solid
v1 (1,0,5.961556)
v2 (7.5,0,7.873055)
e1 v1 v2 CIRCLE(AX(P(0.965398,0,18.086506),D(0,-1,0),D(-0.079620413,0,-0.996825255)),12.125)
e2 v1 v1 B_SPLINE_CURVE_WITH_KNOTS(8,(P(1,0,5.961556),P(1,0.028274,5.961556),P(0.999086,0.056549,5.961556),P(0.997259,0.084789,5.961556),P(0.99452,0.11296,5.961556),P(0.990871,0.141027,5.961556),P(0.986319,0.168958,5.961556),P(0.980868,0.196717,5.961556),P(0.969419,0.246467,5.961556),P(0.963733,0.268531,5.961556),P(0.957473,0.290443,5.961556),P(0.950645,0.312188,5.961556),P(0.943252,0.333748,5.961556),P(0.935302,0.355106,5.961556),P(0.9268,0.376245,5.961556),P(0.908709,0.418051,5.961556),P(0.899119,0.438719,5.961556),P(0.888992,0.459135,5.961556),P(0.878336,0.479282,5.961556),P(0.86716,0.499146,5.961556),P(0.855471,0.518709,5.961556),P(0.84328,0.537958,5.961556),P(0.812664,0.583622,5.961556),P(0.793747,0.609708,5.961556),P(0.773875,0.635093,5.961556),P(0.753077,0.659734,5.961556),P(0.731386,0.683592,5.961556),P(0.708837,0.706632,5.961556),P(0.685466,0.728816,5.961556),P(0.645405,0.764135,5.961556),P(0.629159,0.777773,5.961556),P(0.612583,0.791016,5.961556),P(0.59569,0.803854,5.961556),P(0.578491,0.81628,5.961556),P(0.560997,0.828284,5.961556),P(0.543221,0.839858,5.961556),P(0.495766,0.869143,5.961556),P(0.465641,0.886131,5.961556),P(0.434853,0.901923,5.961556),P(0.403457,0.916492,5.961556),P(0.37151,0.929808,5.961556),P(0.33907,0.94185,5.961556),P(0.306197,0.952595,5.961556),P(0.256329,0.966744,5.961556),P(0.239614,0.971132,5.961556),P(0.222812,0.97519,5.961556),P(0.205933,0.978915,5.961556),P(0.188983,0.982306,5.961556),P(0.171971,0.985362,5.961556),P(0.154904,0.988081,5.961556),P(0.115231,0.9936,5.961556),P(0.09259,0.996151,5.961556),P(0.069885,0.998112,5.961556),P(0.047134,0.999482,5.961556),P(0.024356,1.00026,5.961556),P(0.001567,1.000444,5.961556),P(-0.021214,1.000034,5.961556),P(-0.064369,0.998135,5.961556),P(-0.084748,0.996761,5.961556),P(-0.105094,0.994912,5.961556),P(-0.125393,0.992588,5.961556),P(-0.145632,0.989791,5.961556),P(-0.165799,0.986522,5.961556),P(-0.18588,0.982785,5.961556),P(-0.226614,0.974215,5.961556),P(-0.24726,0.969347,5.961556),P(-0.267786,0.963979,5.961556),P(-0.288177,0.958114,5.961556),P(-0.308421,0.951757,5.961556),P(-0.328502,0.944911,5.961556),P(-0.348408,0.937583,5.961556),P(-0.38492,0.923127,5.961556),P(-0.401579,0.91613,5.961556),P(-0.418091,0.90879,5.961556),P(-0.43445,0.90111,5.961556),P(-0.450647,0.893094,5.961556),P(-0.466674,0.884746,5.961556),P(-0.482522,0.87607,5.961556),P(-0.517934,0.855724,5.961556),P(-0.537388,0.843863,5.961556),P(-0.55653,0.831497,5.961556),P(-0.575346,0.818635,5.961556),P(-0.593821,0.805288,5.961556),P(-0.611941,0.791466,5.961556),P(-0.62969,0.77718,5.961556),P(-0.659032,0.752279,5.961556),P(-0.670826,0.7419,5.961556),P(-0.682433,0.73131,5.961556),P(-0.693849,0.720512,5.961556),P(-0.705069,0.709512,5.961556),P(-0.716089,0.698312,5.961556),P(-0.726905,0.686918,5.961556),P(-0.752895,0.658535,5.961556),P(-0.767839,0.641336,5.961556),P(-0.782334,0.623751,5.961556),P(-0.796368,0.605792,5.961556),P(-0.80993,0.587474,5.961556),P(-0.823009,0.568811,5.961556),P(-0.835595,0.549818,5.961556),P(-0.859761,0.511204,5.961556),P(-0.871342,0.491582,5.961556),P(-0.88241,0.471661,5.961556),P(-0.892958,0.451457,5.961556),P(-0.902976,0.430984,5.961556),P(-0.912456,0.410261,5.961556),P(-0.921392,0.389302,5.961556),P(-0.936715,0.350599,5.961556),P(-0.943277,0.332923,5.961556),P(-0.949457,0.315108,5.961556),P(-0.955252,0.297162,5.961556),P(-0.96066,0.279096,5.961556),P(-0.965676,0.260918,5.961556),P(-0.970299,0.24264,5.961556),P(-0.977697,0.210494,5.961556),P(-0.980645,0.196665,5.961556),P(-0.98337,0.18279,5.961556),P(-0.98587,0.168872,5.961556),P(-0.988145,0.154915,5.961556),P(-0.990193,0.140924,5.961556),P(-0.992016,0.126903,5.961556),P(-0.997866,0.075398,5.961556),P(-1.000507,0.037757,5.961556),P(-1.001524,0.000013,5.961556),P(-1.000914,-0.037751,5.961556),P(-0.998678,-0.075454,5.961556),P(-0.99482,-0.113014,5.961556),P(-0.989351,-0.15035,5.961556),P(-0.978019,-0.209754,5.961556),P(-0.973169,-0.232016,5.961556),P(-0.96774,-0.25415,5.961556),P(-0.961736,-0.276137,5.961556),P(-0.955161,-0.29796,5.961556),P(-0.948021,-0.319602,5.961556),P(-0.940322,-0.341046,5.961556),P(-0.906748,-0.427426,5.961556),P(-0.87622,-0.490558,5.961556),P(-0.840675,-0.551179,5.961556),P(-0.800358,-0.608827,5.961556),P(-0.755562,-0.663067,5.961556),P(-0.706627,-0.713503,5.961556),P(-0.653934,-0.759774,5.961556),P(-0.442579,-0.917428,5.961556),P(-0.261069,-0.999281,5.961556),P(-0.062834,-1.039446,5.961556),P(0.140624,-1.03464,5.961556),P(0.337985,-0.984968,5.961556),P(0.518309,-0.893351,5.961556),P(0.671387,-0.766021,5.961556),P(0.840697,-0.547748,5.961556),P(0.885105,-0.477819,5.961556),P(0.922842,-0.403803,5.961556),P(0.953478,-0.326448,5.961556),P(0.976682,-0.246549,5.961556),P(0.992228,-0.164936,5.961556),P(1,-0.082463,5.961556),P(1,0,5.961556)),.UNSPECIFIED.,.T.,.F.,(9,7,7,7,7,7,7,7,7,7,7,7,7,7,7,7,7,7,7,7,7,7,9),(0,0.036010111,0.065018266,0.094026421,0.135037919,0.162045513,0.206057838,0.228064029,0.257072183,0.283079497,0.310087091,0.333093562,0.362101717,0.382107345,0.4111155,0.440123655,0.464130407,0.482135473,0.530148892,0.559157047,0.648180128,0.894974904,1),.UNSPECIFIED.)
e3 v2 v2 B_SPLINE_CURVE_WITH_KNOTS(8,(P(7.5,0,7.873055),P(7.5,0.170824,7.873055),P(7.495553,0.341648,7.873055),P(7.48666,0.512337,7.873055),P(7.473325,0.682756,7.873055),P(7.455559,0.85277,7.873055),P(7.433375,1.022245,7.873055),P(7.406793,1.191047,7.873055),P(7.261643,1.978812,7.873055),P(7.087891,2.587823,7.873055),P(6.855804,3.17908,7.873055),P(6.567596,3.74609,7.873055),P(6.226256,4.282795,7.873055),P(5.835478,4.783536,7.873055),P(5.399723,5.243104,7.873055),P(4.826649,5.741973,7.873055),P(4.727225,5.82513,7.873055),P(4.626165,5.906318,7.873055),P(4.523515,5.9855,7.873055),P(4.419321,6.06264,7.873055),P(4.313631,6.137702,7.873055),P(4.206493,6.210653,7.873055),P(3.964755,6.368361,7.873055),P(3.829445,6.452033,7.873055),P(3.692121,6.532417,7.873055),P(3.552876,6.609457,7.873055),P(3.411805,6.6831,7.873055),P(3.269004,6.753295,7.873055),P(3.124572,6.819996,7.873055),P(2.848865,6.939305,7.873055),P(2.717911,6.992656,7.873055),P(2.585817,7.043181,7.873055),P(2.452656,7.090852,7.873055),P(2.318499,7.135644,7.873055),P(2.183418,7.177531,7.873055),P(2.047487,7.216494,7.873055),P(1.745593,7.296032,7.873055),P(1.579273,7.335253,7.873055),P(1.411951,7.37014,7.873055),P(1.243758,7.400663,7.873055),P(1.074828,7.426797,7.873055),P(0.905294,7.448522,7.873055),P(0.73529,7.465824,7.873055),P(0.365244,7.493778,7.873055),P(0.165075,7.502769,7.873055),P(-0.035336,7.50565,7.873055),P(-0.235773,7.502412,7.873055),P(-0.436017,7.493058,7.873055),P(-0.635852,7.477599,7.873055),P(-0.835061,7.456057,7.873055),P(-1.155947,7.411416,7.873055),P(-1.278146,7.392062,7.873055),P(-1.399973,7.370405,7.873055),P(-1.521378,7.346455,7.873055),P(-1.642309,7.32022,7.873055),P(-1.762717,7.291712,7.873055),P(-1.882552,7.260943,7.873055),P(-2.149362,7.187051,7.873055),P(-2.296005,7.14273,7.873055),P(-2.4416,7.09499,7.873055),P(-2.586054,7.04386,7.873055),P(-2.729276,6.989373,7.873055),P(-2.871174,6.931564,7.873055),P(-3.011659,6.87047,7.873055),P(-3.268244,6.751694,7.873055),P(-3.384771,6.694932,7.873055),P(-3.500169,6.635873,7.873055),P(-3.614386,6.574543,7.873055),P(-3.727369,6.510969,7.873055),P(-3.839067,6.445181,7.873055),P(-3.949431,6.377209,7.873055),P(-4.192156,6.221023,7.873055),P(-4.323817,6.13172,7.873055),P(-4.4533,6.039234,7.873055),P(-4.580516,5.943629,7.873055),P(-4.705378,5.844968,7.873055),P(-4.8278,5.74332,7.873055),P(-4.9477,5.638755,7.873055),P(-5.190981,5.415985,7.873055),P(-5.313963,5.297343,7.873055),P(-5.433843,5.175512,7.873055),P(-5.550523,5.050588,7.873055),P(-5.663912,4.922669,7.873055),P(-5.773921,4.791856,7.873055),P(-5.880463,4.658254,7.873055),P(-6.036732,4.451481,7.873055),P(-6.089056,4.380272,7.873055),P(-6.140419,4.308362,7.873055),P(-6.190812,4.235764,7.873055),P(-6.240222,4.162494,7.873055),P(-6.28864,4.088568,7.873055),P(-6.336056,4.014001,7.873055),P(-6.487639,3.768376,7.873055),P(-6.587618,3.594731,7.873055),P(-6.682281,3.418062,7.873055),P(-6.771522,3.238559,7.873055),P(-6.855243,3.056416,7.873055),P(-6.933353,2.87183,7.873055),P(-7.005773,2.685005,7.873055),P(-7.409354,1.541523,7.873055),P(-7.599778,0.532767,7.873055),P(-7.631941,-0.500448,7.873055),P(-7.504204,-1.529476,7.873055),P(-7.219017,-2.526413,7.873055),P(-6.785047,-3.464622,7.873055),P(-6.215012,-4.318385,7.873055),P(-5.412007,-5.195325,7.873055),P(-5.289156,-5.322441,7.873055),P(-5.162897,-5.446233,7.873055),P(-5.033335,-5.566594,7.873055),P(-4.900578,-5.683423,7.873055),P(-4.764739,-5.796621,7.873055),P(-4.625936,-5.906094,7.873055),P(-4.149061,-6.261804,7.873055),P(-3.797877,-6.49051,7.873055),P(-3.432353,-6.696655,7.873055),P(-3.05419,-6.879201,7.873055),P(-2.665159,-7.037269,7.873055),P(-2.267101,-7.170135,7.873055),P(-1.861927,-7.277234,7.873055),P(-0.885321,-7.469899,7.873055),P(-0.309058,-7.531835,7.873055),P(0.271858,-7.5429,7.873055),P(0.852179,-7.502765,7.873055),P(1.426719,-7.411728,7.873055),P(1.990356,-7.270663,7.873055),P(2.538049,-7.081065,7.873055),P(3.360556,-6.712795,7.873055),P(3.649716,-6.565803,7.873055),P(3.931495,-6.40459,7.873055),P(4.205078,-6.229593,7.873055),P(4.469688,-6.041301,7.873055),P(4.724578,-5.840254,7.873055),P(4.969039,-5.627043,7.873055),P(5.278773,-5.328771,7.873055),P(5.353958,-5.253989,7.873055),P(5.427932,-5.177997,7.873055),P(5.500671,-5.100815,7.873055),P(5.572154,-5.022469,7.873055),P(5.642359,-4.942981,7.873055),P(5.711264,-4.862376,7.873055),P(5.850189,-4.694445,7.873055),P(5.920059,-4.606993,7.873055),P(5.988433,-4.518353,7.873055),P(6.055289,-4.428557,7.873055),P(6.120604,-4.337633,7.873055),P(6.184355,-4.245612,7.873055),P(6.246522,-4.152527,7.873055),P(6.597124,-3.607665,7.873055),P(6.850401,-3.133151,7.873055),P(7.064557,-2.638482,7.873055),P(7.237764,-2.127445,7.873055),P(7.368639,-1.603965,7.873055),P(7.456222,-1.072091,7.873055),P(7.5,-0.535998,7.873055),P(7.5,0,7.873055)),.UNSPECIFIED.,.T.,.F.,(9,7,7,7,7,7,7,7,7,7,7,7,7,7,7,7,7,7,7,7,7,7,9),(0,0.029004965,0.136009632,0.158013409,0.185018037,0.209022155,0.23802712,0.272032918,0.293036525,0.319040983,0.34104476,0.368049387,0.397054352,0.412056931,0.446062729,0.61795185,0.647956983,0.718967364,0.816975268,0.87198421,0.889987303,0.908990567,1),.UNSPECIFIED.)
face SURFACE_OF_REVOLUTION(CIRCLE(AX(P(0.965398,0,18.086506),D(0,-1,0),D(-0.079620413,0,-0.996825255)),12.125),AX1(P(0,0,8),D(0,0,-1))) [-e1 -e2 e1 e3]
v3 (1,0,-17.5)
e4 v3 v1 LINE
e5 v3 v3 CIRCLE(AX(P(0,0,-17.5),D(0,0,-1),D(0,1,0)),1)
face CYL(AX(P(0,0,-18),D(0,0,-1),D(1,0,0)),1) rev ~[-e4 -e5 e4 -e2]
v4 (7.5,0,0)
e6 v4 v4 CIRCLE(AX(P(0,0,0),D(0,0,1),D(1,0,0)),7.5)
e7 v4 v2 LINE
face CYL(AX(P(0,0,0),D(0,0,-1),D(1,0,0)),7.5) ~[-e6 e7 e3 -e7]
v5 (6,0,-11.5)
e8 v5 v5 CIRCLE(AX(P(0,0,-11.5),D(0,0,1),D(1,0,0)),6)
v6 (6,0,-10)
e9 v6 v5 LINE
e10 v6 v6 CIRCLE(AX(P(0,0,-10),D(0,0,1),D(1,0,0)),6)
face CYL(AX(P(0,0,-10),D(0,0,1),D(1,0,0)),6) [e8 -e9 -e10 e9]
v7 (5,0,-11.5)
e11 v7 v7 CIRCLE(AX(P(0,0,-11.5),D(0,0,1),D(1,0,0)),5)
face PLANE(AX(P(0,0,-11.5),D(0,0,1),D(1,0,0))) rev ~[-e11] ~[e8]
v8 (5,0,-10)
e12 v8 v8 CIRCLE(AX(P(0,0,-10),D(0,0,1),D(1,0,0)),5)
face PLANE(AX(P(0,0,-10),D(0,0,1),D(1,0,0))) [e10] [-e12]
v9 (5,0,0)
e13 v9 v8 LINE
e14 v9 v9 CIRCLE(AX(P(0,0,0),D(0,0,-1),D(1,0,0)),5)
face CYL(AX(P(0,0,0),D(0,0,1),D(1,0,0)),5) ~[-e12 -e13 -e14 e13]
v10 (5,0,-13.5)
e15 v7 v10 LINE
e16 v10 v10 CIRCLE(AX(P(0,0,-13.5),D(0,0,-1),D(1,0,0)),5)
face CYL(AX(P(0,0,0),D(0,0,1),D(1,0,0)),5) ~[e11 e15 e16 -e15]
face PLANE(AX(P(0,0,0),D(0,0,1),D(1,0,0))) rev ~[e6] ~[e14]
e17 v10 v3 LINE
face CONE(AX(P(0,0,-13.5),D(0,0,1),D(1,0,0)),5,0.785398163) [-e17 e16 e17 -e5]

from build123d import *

# Parameters (mm, degrees)
F0_R      = 7.5
F1_DEPTH  = 10
F4_R      = 5
F5_DEPTH  = 18
F6_R      = 1
F7_DEPTH  = 25.8740546369
F10_R     = 6
F10_R_2   = 5
F11_DEPTH = 1.5


# Not quite as in the source:
# - a fillet or chamfer that OpenCascade refuses, or shapes differently, is made with other operations: its cross-section is extruded or revolved along the edge and cut away or added


with BuildPart() as f1:
    # F0 (on Top) → F1 (new body)
    with BuildSketch(Plane.XY):
        Circle(F0_R)
    extrude(amount=F1_DEPTH)

    # F2 (on Front) → F3 (revolve, cut)
    with BuildSketch(Plane.XZ):
        with BuildLine():
            Line((10, 10), (0, 10))
            Line((0, 10), (0, 6))
            ThreePointArc((0, 6), (5.4685094621, 6.8287263446), (10, 10))
        make_face()
    revolve(axis=Axis((0, 0, 8), (0, 0, -1)), mode=Mode.SUBTRACT)

    # F4 (on face) → F5 (join)
    with BuildSketch(Plane(origin=(0, 0, 0), x_dir=(1, 0, 0), z_dir=(0, 0, -1))):
        Circle(F4_R)
    extrude(amount=F5_DEPTH)

    # F6 (on face) → F7 (cut, through all)
    with BuildSketch(Plane(origin=(0, 0, -18), x_dir=(1, 0, 0), z_dir=(0, 0, -1))):
        Circle(F6_R)
    extrude(amount=-F7_DEPTH, mode=Mode.SUBTRACT)

    # F8: chamfer of 4.5 on 1 edges, made by hand

    # F8_s1 → F8_t2 (revolve, cut)
    with BuildSketch(Plane.XZ):
        Polygon((5, -13.5), (0.5, -18), (5, -18), align=None)
    revolve(axis=Axis((0, 0, -18), (0, 0, -1)), mode=Mode.SUBTRACT)

    # F10 (on offset) → F11 (join)
    with BuildSketch(Plane.XY.offset(-10)):
        Circle(F10_R)
        Circle(F10_R_2, mode=Mode.SUBTRACT)
    extrude(amount=-F11_DEPTH)


solid = f1.part
